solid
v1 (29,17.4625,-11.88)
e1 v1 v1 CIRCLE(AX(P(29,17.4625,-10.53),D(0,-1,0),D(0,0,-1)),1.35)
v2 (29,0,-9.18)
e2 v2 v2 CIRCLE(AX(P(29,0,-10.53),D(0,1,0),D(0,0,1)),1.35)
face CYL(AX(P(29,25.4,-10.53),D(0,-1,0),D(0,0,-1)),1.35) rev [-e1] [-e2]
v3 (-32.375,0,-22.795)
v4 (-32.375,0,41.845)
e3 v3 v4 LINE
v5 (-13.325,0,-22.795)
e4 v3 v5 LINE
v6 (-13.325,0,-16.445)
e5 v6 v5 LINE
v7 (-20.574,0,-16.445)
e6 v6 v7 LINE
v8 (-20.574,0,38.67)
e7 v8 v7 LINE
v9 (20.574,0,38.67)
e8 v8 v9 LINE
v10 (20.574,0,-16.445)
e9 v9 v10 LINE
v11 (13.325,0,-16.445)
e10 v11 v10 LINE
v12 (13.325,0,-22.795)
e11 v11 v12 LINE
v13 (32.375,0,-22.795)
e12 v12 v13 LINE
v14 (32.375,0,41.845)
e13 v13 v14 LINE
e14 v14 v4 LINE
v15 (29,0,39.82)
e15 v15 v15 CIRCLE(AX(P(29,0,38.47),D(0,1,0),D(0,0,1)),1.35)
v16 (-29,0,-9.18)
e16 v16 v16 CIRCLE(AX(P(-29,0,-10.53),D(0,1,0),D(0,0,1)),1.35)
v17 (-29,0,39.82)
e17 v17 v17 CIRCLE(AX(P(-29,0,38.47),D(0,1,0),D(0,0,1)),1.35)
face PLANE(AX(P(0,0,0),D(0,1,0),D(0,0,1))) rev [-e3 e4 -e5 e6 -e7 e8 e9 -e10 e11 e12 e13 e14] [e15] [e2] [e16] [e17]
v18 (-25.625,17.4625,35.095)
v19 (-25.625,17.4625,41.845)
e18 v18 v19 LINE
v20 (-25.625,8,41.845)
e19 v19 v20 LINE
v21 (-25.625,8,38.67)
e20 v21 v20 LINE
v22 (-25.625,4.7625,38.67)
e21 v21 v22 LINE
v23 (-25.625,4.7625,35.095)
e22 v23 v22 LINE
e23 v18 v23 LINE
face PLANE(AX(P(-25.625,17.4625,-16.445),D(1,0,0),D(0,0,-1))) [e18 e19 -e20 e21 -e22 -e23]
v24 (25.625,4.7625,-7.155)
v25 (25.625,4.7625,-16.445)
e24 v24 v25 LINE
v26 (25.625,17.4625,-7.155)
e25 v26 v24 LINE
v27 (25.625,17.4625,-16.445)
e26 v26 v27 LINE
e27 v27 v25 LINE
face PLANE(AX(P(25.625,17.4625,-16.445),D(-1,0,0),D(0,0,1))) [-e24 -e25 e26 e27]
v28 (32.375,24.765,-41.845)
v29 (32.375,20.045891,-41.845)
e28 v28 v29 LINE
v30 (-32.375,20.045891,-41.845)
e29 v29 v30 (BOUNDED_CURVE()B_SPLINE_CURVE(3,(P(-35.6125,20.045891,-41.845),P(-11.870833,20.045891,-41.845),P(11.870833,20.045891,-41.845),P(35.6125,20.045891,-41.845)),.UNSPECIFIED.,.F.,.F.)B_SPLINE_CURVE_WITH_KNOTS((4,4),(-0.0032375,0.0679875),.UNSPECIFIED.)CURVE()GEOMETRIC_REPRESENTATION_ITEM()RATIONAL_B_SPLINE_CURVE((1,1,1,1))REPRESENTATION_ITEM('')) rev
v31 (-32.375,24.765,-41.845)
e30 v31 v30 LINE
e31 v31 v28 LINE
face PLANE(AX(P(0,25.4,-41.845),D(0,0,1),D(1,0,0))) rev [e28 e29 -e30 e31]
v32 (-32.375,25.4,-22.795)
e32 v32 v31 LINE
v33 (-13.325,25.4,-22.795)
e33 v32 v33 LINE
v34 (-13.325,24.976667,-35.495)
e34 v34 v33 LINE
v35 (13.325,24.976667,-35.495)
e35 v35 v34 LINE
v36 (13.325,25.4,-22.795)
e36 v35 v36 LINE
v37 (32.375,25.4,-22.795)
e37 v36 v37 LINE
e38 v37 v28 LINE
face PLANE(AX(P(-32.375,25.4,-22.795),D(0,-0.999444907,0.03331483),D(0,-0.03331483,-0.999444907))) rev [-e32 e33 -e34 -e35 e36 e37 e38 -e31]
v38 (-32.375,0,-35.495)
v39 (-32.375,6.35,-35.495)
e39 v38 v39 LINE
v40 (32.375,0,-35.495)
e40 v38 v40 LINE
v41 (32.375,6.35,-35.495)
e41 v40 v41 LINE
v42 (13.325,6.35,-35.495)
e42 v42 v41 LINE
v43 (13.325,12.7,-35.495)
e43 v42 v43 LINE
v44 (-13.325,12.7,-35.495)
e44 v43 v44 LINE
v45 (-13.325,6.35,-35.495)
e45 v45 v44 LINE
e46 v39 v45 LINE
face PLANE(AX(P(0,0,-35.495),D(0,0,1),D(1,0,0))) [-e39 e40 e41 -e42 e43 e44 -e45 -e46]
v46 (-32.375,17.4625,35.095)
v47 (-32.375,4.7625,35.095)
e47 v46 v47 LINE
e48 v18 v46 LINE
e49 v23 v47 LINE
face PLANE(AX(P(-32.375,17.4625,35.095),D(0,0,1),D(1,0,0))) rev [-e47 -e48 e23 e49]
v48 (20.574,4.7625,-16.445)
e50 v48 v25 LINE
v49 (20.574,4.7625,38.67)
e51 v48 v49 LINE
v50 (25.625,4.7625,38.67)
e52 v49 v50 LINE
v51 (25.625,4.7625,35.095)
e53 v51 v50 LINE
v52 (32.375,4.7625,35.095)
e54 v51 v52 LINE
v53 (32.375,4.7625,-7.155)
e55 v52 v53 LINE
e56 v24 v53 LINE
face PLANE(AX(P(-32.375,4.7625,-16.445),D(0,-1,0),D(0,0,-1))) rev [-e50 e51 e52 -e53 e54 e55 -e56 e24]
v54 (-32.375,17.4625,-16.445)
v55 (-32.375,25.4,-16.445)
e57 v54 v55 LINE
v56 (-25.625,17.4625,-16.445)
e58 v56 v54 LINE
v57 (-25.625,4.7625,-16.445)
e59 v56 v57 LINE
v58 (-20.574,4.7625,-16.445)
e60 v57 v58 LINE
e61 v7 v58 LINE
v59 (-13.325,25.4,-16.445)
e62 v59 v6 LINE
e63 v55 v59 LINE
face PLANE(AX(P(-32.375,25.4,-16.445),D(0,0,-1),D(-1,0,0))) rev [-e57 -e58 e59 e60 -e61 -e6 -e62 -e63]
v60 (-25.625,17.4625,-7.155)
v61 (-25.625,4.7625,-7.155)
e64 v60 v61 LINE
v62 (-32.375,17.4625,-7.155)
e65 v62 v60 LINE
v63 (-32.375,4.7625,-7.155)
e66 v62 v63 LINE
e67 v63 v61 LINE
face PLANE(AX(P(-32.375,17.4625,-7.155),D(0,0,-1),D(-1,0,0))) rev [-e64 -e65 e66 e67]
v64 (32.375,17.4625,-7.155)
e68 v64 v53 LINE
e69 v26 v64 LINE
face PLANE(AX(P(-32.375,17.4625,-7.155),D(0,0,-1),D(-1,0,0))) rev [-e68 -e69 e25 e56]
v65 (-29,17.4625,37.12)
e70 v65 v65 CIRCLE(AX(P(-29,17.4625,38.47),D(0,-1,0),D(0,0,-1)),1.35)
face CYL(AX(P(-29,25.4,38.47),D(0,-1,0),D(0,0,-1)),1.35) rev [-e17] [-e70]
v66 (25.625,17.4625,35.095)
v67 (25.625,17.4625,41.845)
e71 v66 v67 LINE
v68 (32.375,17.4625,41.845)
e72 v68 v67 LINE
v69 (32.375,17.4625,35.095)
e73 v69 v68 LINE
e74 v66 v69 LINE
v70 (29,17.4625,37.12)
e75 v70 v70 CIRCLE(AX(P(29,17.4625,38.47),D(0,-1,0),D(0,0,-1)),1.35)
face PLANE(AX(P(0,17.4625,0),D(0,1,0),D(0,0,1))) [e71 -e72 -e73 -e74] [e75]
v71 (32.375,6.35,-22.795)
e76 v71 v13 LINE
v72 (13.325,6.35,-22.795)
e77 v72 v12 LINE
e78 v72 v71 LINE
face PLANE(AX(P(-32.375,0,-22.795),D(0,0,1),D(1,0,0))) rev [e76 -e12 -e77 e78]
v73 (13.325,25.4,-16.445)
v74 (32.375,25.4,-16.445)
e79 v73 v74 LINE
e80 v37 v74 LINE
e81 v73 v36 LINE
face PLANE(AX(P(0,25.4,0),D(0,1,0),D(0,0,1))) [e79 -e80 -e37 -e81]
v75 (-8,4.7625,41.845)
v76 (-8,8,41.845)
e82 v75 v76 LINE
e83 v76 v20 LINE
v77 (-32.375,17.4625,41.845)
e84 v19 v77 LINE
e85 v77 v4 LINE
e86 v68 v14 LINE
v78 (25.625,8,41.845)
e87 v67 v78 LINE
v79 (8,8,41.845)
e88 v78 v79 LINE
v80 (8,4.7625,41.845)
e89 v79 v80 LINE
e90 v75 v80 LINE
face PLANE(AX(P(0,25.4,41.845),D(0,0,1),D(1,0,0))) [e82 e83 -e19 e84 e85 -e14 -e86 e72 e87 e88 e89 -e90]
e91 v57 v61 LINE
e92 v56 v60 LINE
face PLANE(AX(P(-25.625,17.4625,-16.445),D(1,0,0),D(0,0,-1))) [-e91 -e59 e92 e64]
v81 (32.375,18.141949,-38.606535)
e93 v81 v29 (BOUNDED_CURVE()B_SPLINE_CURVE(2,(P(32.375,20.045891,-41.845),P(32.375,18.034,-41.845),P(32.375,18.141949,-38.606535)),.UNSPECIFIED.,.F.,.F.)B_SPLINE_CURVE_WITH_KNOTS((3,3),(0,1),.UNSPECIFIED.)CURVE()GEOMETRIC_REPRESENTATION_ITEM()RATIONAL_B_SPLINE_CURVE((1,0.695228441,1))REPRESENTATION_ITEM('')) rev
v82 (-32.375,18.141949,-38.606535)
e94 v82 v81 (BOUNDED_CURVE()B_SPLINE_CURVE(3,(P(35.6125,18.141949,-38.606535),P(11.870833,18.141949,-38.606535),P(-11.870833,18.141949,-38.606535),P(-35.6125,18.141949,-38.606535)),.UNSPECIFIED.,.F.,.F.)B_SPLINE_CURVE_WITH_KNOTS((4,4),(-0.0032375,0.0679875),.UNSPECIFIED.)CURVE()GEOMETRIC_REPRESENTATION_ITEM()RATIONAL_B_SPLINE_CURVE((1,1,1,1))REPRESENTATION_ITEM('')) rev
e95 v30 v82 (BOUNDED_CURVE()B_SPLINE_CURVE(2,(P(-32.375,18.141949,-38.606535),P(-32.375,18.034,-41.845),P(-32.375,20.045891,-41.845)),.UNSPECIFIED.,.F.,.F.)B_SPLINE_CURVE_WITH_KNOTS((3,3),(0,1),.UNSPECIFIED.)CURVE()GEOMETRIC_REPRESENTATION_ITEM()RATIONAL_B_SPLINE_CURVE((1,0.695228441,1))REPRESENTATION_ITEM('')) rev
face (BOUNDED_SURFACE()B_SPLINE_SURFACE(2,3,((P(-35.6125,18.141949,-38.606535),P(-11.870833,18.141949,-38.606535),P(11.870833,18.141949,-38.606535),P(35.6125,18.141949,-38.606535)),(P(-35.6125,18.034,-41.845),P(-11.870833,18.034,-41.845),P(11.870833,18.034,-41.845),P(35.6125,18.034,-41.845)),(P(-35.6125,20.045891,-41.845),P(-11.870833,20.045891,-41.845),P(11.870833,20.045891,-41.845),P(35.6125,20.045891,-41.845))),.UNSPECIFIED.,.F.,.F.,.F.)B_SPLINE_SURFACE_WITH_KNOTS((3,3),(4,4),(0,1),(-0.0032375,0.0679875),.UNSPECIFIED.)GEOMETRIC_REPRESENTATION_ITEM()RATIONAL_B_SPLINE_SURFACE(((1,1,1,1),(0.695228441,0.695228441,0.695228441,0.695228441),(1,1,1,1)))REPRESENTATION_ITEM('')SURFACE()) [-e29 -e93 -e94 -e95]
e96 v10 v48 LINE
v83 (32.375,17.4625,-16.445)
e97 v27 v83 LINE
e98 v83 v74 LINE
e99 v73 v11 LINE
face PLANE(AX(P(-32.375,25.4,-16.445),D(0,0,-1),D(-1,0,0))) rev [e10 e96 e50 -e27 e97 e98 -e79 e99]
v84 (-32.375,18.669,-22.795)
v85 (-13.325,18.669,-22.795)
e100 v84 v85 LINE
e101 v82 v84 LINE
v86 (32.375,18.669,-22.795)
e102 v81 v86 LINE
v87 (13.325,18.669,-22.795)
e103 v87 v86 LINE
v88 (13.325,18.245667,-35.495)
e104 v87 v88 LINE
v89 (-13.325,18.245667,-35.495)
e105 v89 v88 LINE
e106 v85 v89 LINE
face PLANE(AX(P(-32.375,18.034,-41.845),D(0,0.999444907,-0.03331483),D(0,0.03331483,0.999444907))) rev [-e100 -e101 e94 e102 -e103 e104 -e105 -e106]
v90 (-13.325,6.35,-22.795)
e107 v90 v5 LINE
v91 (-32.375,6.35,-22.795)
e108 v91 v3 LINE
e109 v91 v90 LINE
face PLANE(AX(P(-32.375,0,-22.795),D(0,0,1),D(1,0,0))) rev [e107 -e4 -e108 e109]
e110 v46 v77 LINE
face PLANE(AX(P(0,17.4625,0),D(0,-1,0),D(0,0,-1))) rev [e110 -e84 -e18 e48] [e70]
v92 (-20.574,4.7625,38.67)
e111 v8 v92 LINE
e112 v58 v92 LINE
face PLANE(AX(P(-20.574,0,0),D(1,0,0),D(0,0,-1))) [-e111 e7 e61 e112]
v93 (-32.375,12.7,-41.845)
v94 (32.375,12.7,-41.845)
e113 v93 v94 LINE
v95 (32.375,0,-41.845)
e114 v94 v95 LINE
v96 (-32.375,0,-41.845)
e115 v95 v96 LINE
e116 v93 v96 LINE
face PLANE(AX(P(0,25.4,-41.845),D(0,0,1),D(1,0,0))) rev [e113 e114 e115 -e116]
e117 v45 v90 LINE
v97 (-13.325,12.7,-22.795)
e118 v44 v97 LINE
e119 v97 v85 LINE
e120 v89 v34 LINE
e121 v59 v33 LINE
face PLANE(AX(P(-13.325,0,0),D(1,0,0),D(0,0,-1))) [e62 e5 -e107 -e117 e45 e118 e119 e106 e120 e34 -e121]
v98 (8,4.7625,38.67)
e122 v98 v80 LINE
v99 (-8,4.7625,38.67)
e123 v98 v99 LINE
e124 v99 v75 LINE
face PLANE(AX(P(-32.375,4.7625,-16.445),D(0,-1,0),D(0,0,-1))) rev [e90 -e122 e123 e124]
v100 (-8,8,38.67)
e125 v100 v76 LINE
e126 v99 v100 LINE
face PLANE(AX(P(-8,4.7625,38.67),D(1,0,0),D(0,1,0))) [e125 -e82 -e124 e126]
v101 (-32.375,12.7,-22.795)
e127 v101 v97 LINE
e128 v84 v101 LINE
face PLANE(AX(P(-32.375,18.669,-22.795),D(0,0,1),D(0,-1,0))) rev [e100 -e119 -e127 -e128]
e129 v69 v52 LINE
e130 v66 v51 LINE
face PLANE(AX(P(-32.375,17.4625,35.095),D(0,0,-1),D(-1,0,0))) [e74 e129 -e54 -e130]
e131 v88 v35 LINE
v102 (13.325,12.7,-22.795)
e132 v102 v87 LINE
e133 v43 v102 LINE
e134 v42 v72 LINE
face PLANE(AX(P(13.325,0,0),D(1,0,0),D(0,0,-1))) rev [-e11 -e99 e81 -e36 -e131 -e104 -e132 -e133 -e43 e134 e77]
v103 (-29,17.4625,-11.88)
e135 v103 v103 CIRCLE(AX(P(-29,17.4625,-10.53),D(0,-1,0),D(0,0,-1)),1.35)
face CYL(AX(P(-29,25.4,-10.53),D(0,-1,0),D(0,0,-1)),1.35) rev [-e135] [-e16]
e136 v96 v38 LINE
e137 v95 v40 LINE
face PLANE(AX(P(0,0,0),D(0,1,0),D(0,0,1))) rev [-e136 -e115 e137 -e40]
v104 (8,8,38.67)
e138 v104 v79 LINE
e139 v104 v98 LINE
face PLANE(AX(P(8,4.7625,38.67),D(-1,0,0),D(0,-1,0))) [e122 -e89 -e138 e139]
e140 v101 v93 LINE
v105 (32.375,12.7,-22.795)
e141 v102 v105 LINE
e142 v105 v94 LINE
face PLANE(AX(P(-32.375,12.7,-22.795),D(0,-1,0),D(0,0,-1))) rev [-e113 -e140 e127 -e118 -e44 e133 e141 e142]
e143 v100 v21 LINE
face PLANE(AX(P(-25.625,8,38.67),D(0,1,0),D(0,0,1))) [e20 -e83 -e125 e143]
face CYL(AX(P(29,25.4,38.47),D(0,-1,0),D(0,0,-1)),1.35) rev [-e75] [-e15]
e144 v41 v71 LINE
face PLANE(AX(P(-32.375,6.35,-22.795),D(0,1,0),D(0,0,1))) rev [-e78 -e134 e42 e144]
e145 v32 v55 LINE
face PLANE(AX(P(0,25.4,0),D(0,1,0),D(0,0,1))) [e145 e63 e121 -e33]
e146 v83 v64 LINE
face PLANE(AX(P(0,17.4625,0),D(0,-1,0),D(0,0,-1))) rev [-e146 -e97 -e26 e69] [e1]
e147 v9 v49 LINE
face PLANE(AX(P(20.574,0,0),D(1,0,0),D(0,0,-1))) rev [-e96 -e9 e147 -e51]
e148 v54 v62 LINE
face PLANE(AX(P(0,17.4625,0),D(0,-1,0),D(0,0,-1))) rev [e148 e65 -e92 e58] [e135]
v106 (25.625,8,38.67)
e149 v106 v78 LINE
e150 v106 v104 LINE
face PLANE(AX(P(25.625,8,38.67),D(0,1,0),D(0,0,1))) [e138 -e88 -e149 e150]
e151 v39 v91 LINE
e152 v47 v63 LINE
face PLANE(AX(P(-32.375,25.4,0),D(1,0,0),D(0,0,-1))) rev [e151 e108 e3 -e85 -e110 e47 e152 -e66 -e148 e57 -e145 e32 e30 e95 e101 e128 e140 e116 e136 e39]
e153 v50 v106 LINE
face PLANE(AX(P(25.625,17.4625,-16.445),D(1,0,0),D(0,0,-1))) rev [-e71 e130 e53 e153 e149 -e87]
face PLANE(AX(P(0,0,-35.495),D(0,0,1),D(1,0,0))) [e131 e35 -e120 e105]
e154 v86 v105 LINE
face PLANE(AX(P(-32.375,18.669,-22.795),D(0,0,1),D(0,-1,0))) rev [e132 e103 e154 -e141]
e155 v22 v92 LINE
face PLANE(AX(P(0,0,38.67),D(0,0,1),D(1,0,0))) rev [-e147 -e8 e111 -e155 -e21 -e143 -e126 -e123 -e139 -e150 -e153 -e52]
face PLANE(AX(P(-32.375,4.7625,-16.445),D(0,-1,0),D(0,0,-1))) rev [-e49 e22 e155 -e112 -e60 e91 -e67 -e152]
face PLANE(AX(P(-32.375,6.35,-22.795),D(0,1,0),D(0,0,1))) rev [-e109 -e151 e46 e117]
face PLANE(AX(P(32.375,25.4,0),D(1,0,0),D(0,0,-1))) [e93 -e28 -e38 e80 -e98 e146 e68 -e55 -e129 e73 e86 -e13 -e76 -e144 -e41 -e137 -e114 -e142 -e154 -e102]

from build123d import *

# Parameters (mm, degrees)
SKETCH1_W               = 64.75
SKETCH1_H               = 83.69
SKETCH1_R               = 1.35
BOSS_EXTRUDE1_DEPTH     = 25.4
CUT_EXTRUDE1_DEPTH      = 82.17097095
SKETCH5_W               = 58.29
SKETCH5_H               = 20.6375
CUT_EXTRUDE3_DEPTH      = 82.17097095
BOSS_EXTRUDE2_START     = 4.7625
SKETCH1_3_W             = 6.75
SKETCH1_3_H             = 6.75
SKETCH1_3_R             = 1.35
SKETCH1_3_H_2           = 2.54
BOSS_EXTRUDE2_DEPTH     = 12.7
CUT_EXTRUDE6_DEPTH      = 55.409876401
CUT_EXTRUDE6_DEPTH_BACK = 55.409876401
SKETCH7_W               = 26.65
SKETCH7_H               = 12.7
SKETCH7_W_2             = 7.249
SKETCH7_H_2             = 55.115
SKETCH26_W              = 12.7
SKETCH26_H              = 6.35
CUT_EXTRUDE17_DEPTH     = 82.17097095
SKETCH22_W              = 17.625
SKETCH22_H              = 3.2375
BOSS_EXTRUDE6_DEPTH     = 3.175


with BuildPart() as part:
    # Sketch1 → Boss-Extrude1 (new body)
    with BuildSketch(Plane(origin=(0, 0, 0), x_dir=(1, 0, 0), z_dir=(0, 1, 0))):
        Rectangle(SKETCH1_W, SKETCH1_H)
        with Locations(Location((-29, 10.53, 0), (0, 0, 270))):
            Circle(SKETCH1_R, mode=Mode.SUBTRACT)
        with Locations(Location((-29, -38.47, 0), (0, 0, 270))):
            Circle(SKETCH1_R, mode=Mode.SUBTRACT)
        with Locations(Location((29, 10.53, 0), (0, 0, 270))):
            Circle(SKETCH1_R, mode=Mode.SUBTRACT)
        with Locations(Location((29, -38.47, 0), (0, 0, 270))):
            Circle(SKETCH1_R, mode=Mode.SUBTRACT)
    extrude(amount=BOSS_EXTRUDE1_DEPTH)

    # Sketch3 → Cut-Extrude1 (cut, through all)
    with BuildSketch(Plane(origin=(32.375, 0, 0), x_dir=(0, 0, -1), z_dir=(1, 0, 0))):
        Polygon((41.845, 18.034), (22.795, 18.669), (22.795, 12.7), (41.845, 12.7), align=None)
        Polygon((41.845, 25.4), (22.795, 25.4), (41.845, 24.765), align=None)
    extrude(amount=-CUT_EXTRUDE1_DEPTH, mode=Mode.SUBTRACT)

    # Sketch5 → Cut-Extrude3 (cut, through all)
    with BuildSketch(Plane(origin=(32.375, 0, 0), x_dir=(0, 0, -1), z_dir=(1, 0, 0))):
        with Locations((-12.7, 15.08125)):
            Rectangle(SKETCH5_W, SKETCH5_H)
    extrude(amount=-CUT_EXTRUDE3_DEPTH, mode=Mode.SUBTRACT)

    # Sketch1<3> → Boss-Extrude2 (add)
    # profile 1 of 6: a face of its own
    with BuildSketch(Plane(origin=(0, 0, 0), x_dir=(1, 0, 0), z_dir=(0, 1, 0)).offset(BOSS_EXTRUDE2_START)):
        with Locations((29, -38.47)):
            Rectangle(SKETCH1_3_W, SKETCH1_3_H)
        with Locations(Location((29, -38.47, 0), (0, 0, 90))):
            Circle(SKETCH1_3_R, mode=Mode.SUBTRACT)
    # profile 2 of 6: a face of its own
    with BuildSketch(Plane(origin=(0, 0, 0), x_dir=(1, 0, 0), z_dir=(0, 1, 0)).offset(BOSS_EXTRUDE2_START)):
        with Locations((-29, -38.47)):
            Rectangle(SKETCH1_3_W, SKETCH1_3_H)
        with Locations(Location((-29, -38.47, 0), (0, 0, 90))):
            Circle(SKETCH1_3_R, mode=Mode.SUBTRACT)
    # profile 3 of 6: a face of its own
    with BuildSketch(Plane(origin=(0, 0, 0), x_dir=(1, 0, 0), z_dir=(0, 1, 0)).offset(BOSS_EXTRUDE2_START)):
        with Locations((-29, 10.53)):
            Rectangle(SKETCH1_3_W, SKETCH1_3_H)
        with Locations(Location((-29, 10.53, 0), (0, 0, 90))):
            Circle(SKETCH1_3_R, mode=Mode.SUBTRACT)
    # profile 4 of 6: a face of its own
    with BuildSketch(Plane(origin=(0, 0, 0), x_dir=(1, 0, 0), z_dir=(0, 1, 0)).offset(BOSS_EXTRUDE2_START)):
        with Locations((29, 10.53)):
            Rectangle(SKETCH1_3_W, SKETCH1_3_H)
        with Locations(Location((29, 10.53, 0), (0, 0, 90))):
            Circle(SKETCH1_3_R, mode=Mode.SUBTRACT)
    # profile 5 of 6: a face of its own
    with BuildSketch(Plane(origin=(0, 0, 0), x_dir=(1, 0, 0), z_dir=(0, 1, 0)).offset(BOSS_EXTRUDE2_START)):
        with Locations((-29, 15.175)):
            Rectangle(SKETCH1_3_W, SKETCH1_3_H_2)
    # profile 6 of 6: a face of its own
    with BuildSketch(Plane(origin=(0, 0, 0), x_dir=(1, 0, 0), z_dir=(0, 1, 0)).offset(BOSS_EXTRUDE2_START)):
        with Locations((29, 15.175)):
            Rectangle(SKETCH1_3_W, SKETCH1_3_H_2)
    extrude(amount=BOSS_EXTRUDE2_DEPTH)

    # Sketch7 → Cut-Extrude6 (cut, two sides: drawn at the far end of the back side and taken through both)
    with BuildSketch(Plane(origin=(0, 12.7, 0), x_dir=(1, 0, 0), z_dir=(0, 1, 0)).offset(-CUT_EXTRUDE6_DEPTH_BACK)):
        Polygon((-13.325, 16.445), (-13.325, -38.67), (13.325, -38.67), (13.325, 16.445), (13.325, 22.795), (-13.325, 22.795), align=None)
        with Locations((0, 29.145)):
            Rectangle(SKETCH7_W, SKETCH7_H)
        with Locations((-16.9495, -11.1125)):
            Rectangle(SKETCH7_W_2, SKETCH7_H_2)
        with Locations((16.9495, -11.1125)):
            Rectangle(SKETCH7_W_2, SKETCH7_H_2)
    extrude(amount=CUT_EXTRUDE6_DEPTH + CUT_EXTRUDE6_DEPTH_BACK, mode=Mode.SUBTRACT)

    # Sketch26 → Cut-Extrude17 (cut, through all)
    with BuildSketch(Plane(origin=(32.375, 0, 0), x_dir=(0, 0, -1), z_dir=(1, 0, 0))):
        with Locations((29.145, 3.175)):
            Rectangle(SKETCH26_W, SKETCH26_H)
    extrude(amount=-CUT_EXTRUDE17_DEPTH, mode=Mode.SUBTRACT)

    # Fillet1
    # an asymmetric fillet: 3.175, 1.905 mm, written as the material it takes off along each edge
    with BuildSketch(Plane(origin=(40.475658498, 18.034, -41.845), x_dir=(0, 1, 0), z_dir=(-1, 0, 0))) as fillet1_piece_1:
        with BuildLine():
            Bezier((2.011891373, 0), (0, 0), (0.107948825, -3.238464752), weights=[1, 0.695228441, 1])
            Line((0.107948825, -3.238464752), (0, 0))
            Line((0, 0), (2.011891373, 0))
        make_face()
    extrude(amount=80.951316996, mode=Mode.SUBTRACT)

    # Sketch22 → Boss-Extrude6 (add)
    with BuildSketch(Plane.XY.offset(41.845)):
        with Locations((-16.8125, 6.38125)):
            Rectangle(SKETCH22_W, SKETCH22_H)
        with Locations((16.8125, 6.38125)):
            Rectangle(SKETCH22_W, SKETCH22_H)
    extrude(amount=-BOSS_EXTRUDE6_DEPTH)


solid = part.part
